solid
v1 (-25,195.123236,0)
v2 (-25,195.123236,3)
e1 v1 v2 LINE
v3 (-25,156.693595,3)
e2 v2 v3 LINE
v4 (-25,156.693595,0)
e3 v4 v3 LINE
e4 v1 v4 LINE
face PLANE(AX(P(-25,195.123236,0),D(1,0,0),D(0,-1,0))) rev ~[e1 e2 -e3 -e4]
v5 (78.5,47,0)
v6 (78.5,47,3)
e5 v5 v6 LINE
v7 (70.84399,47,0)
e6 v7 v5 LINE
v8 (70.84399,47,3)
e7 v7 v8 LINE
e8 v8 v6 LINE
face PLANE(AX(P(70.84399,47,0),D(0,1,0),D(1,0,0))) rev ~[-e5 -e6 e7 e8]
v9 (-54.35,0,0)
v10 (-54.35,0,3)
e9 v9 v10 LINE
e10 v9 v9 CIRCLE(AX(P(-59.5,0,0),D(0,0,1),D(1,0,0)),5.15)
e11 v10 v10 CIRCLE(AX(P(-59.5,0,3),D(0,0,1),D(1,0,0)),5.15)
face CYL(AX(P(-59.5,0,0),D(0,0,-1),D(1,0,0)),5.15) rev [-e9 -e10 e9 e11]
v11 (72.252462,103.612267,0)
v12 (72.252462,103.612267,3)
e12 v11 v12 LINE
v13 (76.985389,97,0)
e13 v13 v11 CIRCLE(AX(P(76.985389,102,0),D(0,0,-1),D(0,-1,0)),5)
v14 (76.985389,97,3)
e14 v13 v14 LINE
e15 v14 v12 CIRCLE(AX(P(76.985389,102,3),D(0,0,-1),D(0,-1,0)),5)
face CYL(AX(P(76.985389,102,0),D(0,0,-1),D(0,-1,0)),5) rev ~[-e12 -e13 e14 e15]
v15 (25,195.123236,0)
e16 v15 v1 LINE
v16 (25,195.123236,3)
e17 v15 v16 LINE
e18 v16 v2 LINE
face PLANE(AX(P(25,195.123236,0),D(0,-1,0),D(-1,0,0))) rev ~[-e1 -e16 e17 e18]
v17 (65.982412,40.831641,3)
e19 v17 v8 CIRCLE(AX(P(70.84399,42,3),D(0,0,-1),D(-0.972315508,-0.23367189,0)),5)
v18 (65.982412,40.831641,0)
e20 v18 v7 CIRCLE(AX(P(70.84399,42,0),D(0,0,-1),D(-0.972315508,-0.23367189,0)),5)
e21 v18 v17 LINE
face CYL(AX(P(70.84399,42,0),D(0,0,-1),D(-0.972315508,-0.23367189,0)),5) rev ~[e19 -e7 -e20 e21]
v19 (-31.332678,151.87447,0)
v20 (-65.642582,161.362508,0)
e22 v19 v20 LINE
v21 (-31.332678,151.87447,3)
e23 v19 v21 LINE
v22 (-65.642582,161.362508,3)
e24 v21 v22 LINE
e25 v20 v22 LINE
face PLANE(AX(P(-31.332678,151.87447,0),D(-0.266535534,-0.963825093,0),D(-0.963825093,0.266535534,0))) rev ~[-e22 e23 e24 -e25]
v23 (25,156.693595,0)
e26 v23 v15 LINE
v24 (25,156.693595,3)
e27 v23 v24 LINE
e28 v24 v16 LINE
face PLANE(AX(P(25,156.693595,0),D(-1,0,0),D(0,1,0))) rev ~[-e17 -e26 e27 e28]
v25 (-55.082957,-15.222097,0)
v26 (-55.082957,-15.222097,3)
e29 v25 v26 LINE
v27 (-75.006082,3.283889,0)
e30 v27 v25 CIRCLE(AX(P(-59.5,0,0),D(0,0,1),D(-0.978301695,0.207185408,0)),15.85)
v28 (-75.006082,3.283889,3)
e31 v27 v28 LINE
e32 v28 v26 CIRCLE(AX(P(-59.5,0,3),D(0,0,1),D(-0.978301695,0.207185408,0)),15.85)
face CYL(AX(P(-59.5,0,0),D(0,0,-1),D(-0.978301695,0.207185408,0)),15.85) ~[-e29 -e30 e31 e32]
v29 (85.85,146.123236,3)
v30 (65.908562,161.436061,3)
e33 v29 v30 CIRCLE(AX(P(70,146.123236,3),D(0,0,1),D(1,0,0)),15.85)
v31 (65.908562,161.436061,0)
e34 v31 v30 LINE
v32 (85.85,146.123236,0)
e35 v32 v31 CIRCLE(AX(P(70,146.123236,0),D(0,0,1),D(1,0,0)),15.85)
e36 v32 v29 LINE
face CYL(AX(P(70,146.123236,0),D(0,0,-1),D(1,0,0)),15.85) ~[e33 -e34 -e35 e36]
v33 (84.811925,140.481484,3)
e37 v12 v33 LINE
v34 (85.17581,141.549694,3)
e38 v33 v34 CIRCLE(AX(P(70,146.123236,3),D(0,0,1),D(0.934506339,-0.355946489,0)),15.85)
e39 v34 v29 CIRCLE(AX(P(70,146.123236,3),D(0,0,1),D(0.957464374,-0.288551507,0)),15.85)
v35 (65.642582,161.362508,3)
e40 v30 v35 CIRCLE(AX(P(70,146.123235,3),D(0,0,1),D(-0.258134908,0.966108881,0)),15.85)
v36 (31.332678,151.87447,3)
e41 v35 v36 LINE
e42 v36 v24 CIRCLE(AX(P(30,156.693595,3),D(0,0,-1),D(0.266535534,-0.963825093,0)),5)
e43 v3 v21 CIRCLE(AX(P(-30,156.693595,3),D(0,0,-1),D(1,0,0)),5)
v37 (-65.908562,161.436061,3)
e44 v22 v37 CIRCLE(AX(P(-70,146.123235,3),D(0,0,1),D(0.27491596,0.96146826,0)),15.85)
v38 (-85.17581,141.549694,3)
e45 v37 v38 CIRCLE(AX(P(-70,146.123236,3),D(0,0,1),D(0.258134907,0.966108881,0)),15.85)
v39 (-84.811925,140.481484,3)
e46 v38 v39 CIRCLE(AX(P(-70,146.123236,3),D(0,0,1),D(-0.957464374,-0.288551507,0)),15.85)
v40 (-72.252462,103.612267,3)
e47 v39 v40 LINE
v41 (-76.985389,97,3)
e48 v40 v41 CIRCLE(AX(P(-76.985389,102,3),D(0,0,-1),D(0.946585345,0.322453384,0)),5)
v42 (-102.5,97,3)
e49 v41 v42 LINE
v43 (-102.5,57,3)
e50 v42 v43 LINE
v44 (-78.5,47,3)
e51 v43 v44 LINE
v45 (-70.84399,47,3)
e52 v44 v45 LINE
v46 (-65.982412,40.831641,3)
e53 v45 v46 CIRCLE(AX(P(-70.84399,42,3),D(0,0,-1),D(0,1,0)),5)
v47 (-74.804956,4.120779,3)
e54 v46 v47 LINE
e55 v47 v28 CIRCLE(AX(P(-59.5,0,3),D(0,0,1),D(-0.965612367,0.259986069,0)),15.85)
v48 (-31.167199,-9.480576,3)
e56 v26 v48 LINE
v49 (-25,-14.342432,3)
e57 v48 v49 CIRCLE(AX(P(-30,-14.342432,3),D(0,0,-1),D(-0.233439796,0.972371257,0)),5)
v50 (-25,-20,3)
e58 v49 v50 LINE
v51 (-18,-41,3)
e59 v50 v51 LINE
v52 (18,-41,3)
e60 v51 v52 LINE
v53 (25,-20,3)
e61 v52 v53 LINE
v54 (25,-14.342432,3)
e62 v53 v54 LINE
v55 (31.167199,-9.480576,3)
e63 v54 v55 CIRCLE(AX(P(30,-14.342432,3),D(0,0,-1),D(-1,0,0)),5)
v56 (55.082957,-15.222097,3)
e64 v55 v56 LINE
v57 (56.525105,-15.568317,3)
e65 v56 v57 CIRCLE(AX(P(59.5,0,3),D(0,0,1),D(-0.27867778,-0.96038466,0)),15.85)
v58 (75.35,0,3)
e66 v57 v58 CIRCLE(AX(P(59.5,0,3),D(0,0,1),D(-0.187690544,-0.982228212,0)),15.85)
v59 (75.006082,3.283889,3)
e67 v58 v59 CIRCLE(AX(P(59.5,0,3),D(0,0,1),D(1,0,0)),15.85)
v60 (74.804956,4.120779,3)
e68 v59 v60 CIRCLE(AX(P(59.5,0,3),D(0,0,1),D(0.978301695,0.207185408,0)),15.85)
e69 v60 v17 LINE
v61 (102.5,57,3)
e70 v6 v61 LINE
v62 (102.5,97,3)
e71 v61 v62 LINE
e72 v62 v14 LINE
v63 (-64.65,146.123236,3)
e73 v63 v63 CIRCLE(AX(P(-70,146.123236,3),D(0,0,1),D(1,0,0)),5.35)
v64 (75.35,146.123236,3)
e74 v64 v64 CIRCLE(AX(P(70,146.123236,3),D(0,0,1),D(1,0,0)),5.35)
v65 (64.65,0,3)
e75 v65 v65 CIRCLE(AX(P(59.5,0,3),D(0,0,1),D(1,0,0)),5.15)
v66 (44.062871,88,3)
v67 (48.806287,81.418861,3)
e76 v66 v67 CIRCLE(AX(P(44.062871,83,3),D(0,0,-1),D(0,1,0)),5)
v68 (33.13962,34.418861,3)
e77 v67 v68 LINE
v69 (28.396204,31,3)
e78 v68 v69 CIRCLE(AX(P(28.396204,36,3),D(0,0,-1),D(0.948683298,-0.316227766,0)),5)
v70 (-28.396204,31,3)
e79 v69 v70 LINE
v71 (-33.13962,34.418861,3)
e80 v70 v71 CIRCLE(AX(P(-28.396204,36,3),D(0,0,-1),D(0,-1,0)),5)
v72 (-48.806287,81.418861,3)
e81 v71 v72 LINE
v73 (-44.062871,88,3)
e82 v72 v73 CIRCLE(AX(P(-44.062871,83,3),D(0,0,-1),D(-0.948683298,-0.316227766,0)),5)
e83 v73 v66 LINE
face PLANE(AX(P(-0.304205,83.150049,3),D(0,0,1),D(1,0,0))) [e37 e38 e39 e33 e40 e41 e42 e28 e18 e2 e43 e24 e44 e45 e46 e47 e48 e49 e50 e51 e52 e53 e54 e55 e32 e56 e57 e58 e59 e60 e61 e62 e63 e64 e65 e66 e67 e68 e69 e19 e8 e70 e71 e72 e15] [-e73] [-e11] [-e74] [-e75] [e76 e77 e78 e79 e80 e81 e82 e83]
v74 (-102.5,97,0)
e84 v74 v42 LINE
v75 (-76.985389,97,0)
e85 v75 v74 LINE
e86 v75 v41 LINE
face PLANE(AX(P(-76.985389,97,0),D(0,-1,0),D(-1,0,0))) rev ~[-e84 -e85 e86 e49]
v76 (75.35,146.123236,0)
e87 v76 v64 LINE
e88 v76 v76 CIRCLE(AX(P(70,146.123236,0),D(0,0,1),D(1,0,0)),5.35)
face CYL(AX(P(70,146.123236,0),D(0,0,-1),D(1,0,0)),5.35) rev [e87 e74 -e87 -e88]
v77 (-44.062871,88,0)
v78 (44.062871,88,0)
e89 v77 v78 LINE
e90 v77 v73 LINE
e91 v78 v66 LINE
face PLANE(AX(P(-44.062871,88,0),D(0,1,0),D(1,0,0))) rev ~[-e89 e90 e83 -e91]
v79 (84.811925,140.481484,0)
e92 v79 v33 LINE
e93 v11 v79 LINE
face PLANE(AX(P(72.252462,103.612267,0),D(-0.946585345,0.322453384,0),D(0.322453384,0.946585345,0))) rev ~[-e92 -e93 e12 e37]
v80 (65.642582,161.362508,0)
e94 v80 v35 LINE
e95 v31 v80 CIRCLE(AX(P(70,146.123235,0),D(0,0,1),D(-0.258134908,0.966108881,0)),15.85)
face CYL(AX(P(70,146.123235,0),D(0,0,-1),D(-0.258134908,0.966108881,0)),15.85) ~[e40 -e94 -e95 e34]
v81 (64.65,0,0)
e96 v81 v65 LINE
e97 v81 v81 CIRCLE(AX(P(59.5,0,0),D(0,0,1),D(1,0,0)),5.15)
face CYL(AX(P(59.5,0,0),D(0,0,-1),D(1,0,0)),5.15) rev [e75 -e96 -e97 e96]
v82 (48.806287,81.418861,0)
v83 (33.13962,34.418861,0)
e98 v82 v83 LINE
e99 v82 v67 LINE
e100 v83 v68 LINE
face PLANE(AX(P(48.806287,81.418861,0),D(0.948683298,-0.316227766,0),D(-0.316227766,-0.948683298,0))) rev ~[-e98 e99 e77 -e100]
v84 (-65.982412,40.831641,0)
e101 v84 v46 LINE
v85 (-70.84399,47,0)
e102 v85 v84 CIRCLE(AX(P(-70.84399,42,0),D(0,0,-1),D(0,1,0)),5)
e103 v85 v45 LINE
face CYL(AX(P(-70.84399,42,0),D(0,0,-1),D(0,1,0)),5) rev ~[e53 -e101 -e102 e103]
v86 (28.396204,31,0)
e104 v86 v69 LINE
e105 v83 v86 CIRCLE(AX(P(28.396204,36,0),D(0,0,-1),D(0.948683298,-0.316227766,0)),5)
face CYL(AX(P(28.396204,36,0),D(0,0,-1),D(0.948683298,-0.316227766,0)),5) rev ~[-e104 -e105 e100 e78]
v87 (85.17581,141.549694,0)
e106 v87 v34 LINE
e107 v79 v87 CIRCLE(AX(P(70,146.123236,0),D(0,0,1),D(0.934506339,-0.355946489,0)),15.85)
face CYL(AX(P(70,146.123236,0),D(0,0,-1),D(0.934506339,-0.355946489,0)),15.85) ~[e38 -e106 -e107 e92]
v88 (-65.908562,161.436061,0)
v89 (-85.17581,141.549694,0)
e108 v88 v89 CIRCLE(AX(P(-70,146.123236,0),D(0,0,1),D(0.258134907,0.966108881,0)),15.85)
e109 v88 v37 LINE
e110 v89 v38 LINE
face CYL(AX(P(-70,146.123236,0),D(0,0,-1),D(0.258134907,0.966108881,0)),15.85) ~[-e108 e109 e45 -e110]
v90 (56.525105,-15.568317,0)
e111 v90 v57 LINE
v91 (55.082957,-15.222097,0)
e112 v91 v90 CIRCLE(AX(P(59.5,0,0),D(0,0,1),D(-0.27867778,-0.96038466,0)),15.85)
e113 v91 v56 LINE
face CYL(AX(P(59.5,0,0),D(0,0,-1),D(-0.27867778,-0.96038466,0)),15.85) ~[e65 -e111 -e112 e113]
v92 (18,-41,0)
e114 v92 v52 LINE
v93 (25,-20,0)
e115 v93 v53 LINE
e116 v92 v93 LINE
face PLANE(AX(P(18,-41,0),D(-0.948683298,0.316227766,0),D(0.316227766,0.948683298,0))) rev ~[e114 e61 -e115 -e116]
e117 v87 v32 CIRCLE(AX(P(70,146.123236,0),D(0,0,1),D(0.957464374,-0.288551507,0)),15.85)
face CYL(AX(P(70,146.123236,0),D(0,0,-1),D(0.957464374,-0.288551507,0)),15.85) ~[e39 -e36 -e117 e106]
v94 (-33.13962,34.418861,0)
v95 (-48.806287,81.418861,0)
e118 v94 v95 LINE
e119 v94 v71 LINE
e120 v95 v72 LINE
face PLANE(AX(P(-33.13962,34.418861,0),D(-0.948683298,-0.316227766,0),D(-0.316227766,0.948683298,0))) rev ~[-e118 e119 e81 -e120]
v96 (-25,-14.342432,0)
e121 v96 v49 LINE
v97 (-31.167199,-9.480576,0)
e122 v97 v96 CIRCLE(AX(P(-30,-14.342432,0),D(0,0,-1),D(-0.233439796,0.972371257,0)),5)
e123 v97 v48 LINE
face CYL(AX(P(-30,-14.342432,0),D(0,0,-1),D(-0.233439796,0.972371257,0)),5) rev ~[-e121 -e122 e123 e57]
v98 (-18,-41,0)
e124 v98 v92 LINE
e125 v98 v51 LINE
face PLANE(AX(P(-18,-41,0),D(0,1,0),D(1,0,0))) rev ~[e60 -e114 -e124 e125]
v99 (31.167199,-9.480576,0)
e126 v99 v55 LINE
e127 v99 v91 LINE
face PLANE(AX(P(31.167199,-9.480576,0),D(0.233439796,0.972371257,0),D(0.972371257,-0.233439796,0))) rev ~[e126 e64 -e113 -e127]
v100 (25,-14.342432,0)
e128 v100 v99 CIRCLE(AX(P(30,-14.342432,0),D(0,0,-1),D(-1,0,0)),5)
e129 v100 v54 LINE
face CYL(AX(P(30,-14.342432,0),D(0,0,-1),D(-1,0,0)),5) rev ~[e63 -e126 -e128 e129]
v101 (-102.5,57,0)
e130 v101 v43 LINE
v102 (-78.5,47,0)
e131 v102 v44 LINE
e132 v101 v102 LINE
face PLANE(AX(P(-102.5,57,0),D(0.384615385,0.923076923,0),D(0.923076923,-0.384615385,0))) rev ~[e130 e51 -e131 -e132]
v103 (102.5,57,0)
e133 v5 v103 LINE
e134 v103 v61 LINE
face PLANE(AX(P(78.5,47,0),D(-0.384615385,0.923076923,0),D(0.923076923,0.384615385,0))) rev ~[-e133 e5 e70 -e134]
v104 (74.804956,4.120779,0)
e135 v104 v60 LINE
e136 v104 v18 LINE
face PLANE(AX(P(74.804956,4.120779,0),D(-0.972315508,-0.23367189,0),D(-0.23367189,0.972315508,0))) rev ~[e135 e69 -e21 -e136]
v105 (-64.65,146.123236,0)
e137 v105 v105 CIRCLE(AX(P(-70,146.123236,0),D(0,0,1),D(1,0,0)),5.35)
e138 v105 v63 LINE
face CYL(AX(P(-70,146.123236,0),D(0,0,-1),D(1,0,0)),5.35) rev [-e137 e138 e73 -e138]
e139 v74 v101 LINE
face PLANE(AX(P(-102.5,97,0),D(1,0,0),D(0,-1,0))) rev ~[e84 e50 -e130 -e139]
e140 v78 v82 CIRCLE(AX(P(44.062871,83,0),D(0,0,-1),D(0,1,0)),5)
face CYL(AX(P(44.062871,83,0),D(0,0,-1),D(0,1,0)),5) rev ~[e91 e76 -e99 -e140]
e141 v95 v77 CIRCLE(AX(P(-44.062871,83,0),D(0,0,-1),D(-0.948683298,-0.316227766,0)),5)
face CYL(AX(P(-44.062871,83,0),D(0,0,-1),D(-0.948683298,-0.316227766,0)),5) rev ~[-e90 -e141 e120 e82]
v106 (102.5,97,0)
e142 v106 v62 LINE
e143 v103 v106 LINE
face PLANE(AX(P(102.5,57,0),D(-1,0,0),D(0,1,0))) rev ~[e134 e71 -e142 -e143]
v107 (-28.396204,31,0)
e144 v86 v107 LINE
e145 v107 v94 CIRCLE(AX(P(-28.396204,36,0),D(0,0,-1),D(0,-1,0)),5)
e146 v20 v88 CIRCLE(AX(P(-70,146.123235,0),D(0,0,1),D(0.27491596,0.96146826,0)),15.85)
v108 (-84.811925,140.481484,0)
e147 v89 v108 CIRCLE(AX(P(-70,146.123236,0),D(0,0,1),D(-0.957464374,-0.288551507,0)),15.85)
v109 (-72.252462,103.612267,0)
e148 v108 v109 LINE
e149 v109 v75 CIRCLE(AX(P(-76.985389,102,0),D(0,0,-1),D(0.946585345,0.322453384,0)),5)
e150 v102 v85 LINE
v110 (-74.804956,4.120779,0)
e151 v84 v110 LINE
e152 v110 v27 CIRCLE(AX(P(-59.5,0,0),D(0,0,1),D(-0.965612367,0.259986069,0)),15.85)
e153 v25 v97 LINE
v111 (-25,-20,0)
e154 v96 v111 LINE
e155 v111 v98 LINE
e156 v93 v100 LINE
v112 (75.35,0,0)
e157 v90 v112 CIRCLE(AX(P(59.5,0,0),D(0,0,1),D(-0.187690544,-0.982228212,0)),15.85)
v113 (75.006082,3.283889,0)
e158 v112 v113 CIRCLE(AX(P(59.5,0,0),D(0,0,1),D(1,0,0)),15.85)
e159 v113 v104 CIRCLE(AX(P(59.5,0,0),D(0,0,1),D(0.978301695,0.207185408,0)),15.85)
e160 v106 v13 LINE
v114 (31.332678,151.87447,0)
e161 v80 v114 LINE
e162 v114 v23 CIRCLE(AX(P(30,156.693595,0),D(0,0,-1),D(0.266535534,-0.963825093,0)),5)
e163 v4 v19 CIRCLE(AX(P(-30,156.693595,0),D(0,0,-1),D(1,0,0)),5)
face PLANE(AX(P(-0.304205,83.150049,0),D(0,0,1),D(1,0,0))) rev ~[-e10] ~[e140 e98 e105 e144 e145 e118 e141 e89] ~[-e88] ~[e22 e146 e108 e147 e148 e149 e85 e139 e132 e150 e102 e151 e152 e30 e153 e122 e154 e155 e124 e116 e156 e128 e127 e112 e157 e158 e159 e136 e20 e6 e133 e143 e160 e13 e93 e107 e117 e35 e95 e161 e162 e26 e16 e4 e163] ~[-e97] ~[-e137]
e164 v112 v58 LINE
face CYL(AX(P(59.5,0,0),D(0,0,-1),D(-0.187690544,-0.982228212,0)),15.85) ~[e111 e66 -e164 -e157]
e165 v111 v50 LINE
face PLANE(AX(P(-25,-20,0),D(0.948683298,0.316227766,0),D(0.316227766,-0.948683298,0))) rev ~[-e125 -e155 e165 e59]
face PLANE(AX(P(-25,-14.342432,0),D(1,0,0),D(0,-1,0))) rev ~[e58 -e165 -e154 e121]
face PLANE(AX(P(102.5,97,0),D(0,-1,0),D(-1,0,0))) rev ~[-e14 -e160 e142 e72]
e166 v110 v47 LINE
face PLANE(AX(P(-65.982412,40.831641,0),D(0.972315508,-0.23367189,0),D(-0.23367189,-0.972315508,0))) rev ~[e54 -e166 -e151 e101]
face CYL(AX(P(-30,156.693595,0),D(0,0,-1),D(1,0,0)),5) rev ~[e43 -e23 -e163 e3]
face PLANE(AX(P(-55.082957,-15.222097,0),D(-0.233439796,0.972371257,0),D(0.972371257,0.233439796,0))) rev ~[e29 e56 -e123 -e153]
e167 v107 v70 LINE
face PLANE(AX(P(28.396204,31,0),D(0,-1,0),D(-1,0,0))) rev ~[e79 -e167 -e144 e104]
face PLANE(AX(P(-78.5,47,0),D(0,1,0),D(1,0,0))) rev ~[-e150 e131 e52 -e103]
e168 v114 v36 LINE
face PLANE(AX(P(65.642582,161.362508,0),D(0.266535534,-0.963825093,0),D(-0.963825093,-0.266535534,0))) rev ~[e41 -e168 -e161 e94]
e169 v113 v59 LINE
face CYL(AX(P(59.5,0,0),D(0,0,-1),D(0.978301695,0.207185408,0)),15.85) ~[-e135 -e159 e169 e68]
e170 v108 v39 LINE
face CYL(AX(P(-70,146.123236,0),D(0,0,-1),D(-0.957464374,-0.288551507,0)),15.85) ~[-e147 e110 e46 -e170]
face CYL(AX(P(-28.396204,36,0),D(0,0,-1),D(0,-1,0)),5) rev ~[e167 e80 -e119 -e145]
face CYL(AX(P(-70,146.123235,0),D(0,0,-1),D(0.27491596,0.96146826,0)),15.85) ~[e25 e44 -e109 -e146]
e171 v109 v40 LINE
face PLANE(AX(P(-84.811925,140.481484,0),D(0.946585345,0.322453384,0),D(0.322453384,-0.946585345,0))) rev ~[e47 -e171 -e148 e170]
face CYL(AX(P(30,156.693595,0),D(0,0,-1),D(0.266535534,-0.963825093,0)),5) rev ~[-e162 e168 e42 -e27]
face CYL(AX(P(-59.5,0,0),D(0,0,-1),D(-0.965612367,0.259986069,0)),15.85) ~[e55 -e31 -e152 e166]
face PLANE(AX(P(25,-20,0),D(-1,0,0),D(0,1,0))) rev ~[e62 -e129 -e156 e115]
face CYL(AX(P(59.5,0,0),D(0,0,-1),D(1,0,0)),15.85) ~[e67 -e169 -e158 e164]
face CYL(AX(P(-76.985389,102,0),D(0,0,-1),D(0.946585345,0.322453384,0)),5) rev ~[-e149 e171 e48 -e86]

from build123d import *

# Parameters (mm, degrees)
F0_R     = 5.15
F0_R_2   = 5.35
F1_DEPTH = 3
F2_DEPTH = 3


# Not quite as in the source:
# - a feature names something its author has since deleted; it is built from what else it names


with BuildPart() as f1:
    # F0 (on Top) → F1 (new body)
    with BuildSketch(Plane.XY):
        with BuildLine():
            Line((-25, -20), (0, -20))
            Line((0, -20), (25, -20))
            Line((25, -20), (25, -14.3424324172))
            ThreePointArc((25, -14.3424324172), (26.9045190123, -10.4158566246), (31.167198982, -9.4805761322))
            Line((31.167198982, -9.4805761322), (55.0829571834, -15.2220968581))
            ThreePointArc((55.0829571834, -15.2220968581), (48.4016498049, 11.3158792388), (74.8049560197, 4.1207792025))
            Line((74.8049560197, 4.1207792025), (65.9824120319, 40.8316405516))
            ThreePointArc((65.9824120319, 40.8316405516), (66.917044372, 45.0950123391), (70.8439895742, 47))
            Line((70.8439895742, 47), (78.5, 47))
            Line((78.5, 47), (102.5, 57))
            Line((102.5, 57), (102.5, 97))
            Line((102.5, 97), (78.5, 97))
            Line((78.5, 97), (76.9853890649, 97))
            ThreePointArc((76.9853890649, 97), (72.9195967319, 99.0897882028), (72.2524623398, 103.6122669181))
            Line((72.2524623398, 103.6122669181), (84.8119254692, 140.4814838147))
            ThreePointArc((84.8119254692, 140.4814838147), (58.3240216641, 135.4043723862), (65.6425820254, 161.362507579))
            Line((65.6425820254, 161.362507579), (31.3326776693, 151.8744700251))
            ThreePointArc((31.3326776693, 151.8744700251), (26.9720789596, 152.7146893354), (25, 156.6935954883))
            Line((25, 156.6935954883), (25, 195.1232356609))
            Line((25, 195.1232356609), (0, 195.1232356609))
            Line((0, 195.1232356609), (-25, 195.1232356609))
            Line((-25, 195.1232356609), (-25, 156.6935954883))
            ThreePointArc((-25, 156.6935954883), (-26.9720789596, 152.7146893354), (-31.3326776693, 151.8744700251))
            Line((-31.3326776693, 151.8744700251), (-65.6425820254, 161.362507579))
            ThreePointArc((-65.6425820254, 161.362507579), (-57.3452069377, 155.666752442), (-54.15, 146.1232356609))
            ThreePointArc((-54.15, 146.1232356609), (-67.1317704666, 130.5349144124), (-84.8119254692, 140.4814838147))
            Line((-84.8119254692, 140.4814838147), (-72.2524623398, 103.6122669181))
            ThreePointArc((-72.2524623398, 103.6122669181), (-72.9195967319, 99.0897882028), (-76.9853890649, 97))
            Line((-76.9853890649, 97), (-78.5, 97))
            Line((-78.5, 97), (-102.5, 97))
            Line((-102.5, 97), (-102.5, 57))
            Line((-102.5, 57), (-78.5, 47))
            Line((-78.5, 47), (-70.8439895742, 47))
            ThreePointArc((-70.8439895742, 47), (-66.917044372, 45.0950123391), (-65.9824120319, 40.8316405516))
            Line((-65.9824120319, 40.8316405516), (-74.8049560197, 4.1207792025))
            ThreePointArc((-74.8049560197, 4.1207792025), (-57.4216656804, 15.7131482032), (-43.65, 0))
            ThreePointArc((-43.65, 0), (-46.826550812, -9.5187281545), (-55.0829571834, -15.2220968581))
            Line((-55.0829571834, -15.2220968581), (-31.167198982, -9.4805761322))
            ThreePointArc((-31.167198982, -9.4805761322), (-26.9045190123, -10.4158566246), (-25, -14.3424324172))
            Line((-25, -14.3424324172), (-25, -20))
        make_face()
        with BuildLine():
            Line((28.3962038997, 31), (0, 31))
            Line((0, 31), (-28.3962038997, 31))
            ThreePointArc((-28.3962038997, 31), (-31.319755323, 31.9437890741), (-33.13962039, 34.4188611699))
            Line((-33.13962039, 34.4188611699), (-48.8062870566, 81.4188611699))
            ThreePointArc((-48.8062870566, 81.4188611699), (-48.1190814923, 85.9235514233), (-44.0628705664, 88))
            Line((-44.0628705664, 88), (0, 88))
            Line((0, 88), (44.0628705664, 88))
            ThreePointArc((44.0628705664, 88), (48.1190814923, 85.9235514233), (48.8062870566, 81.4188611699))
            Line((48.8062870566, 81.4188611699), (33.13962039, 34.4188611699))
            ThreePointArc((33.13962039, 34.4188611699), (31.319755323, 31.9437890741), (28.3962038997, 31))
        make_face(mode=Mode.SUBTRACT)
        Polygon((25, -20), (0, -20), (-25, -20), (-18, -41), (0, -41), (18, -41), align=None)
        with BuildLine():
            ThreePointArc((74.8049560197, 4.1207792025), (48.4016498049, 11.3158792388), (55.0829571834, -15.2220968581))
            Line((55.0829571834, -15.2220968581), (56.5251048848, -15.5683171555))
            Line((56.5251048848, -15.5683171555), (75.0060818693, 3.2838887103))
            Line((75.0060818693, 3.2838887103), (74.8049560197, 4.1207792025))
        make_face()
        with Locations((59.5, 0)):
            Circle(F0_R, mode=Mode.SUBTRACT)
        with BuildLine():
            Line((56.5251048848, -15.5683171555), (55.0829571834, -15.2220968581))
            ThreePointArc((55.0829571834, -15.2220968581), (55.799979227, -15.4120844236), (56.5251048848, -15.5683171555))
        make_face()
        with BuildLine():
            Line((-56.5251048848, -15.5683171555), (-55.0829571834, -15.2220968581))
            ThreePointArc((-55.0829571834, -15.2220968581), (-46.826550812, -9.5187281545), (-43.65, 0))
            ThreePointArc((-43.65, 0), (-57.4216656804, 15.7131482032), (-74.8049560197, 4.1207792025))
            Line((-74.8049560197, 4.1207792025), (-75.0060818693, 3.2838887103))
            Line((-75.0060818693, 3.2838887103), (-56.5251048848, -15.5683171555))
        make_face()
        with Locations((-59.5, 0)):
            Circle(F0_R, mode=Mode.SUBTRACT)
        with BuildLine():
            ThreePointArc((-56.5251048848, -15.5683171555), (-55.799979227, -15.4120844236), (-55.0829571834, -15.2220968581))
            Line((-55.0829571834, -15.2220968581), (-56.5251048848, -15.5683171555))
        make_face()
        with BuildLine():
            Line((75.0060818693, 3.2838887103), (56.5251048848, -15.5683171555))
            ThreePointArc((56.5251048848, -15.5683171555), (69.6012477552, -12.2142250588), (75.35, 0))
            ThreePointArc((75.35, 0), (75.2637859924, 1.6509243428), (75.0060818693, 3.2838887103))
        make_face()
        with BuildLine():
            ThreePointArc((75.0060818693, 3.2838887103), (74.9112008089, 3.7036994515), (74.8049560197, 4.1207792025))
            Line((74.8049560197, 4.1207792025), (75.0060818693, 3.2838887103))
        make_face()
        with BuildLine():
            ThreePointArc((-75.0060818693, 3.2838887103), (-70.8185280345, -11.0956488378), (-56.5251048848, -15.5683171555))
            Line((-56.5251048848, -15.5683171555), (-75.0060818693, 3.2838887103))
        make_face()
        with BuildLine():
            ThreePointArc((-74.8049560197, 4.1207792025), (-74.9112008089, 3.7036994515), (-75.0060818693, 3.2838887103))
            Line((-75.0060818693, 3.2838887103), (-74.8049560197, 4.1207792025))
        make_face()
        with BuildLine():
            ThreePointArc((65.6425820254, 161.362507579), (58.3240216641, 135.4043723862), (84.8119254692, 140.4814838147))
            Line((84.8119254692, 140.4814838147), (85.1758103286, 141.5496942681))
            Line((85.1758103286, 141.5496942681), (65.9085617168, 161.4360614215))
            Line((65.9085617168, 161.4360614215), (65.6425820254, 161.362507579))
        make_face()
        with Locations((70, 146.1232356609)):
            Circle(F0_R_2, mode=Mode.SUBTRACT)
        with BuildLine():
            Line((85.1758103286, 141.5496942681), (84.8119254692, 140.4814838147))
            ThreePointArc((84.8119254692, 140.4814838147), (85.0033777185, 141.0123495306), (85.1758103286, 141.5496942681))
        make_face()
        with BuildLine():
            Line((65.9085617168, 161.4360614215), (85.1758103286, 141.5496942681))
            ThreePointArc((85.1758103286, 141.5496942681), (85.6805467651, 143.8117527719), (85.85, 146.1232356609))
            ThreePointArc((85.85, 146.1232356609), (79.6533207553, 158.6944686312), (65.9085617168, 161.4360614215))
        make_face()
        with BuildLine():
            ThreePointArc((65.9085617168, 161.4360614215), (65.7754117883, 161.3998633791), (65.6425820254, 161.362507579))
            Line((65.6425820254, 161.362507579), (65.9085617168, 161.4360614215))
        make_face()
        with BuildLine():
            ThreePointArc((-85.1758103286, 141.5496942681), (-85.0033777185, 141.0123495306), (-84.8119254692, 140.4814838147))
            Line((-84.8119254692, 140.4814838147), (-85.1758103286, 141.5496942681))
        make_face()
        with BuildLine():
            Line((-85.1758103286, 141.5496942681), (-84.8119254692, 140.4814838147))
            ThreePointArc((-84.8119254692, 140.4814838147), (-67.1317704666, 130.5349144124), (-54.15, 146.1232356609))
            ThreePointArc((-54.15, 146.1232356609), (-57.3452069377, 155.666752442), (-65.6425820254, 161.362507579))
            Line((-65.6425820254, 161.362507579), (-65.9085617168, 161.4360614215))
            Line((-65.9085617168, 161.4360614215), (-85.1758103286, 141.5496942681))
        make_face()
        with Locations((-70, 146.1232356609)):
            Circle(F0_R_2, mode=Mode.SUBTRACT)
        with BuildLine():
            ThreePointArc((-65.9085617168, 161.4360614215), (-81.3834408484, 157.1522779788), (-85.1758103286, 141.5496942681))
            Line((-85.1758103286, 141.5496942681), (-65.9085617168, 161.4360614215))
        make_face()
        with BuildLine():
            ThreePointArc((-65.6425820254, 161.362507579), (-65.7754117883, 161.3998633791), (-65.9085617168, 161.4360614215))
            Line((-65.9085617168, 161.4360614215), (-65.6425820254, 161.362507579))
        make_face()
    extrude(amount=F1_DEPTH)

    # F0 (on Top) → F2 (join)
    with BuildSketch(Plane.XY):
        with BuildLine():
            Line((-25, -20), (0, -20))
            Line((0, -20), (25, -20))
            Line((25, -20), (25, -14.3424324172))
            ThreePointArc((25, -14.3424324172), (26.9045190123, -10.4158566246), (31.167198982, -9.4805761322))
            Line((31.167198982, -9.4805761322), (55.0829571834, -15.2220968581))
            ThreePointArc((55.0829571834, -15.2220968581), (48.4016498049, 11.3158792388), (74.8049560197, 4.1207792025))
            Line((74.8049560197, 4.1207792025), (65.9824120319, 40.8316405516))
            ThreePointArc((65.9824120319, 40.8316405516), (66.917044372, 45.0950123391), (70.8439895742, 47))
            Line((70.8439895742, 47), (78.5, 47))
            Line((78.5, 47), (102.5, 57))
            Line((102.5, 57), (102.5, 97))
            Line((102.5, 97), (78.5, 97))
            Line((78.5, 97), (76.9853890649, 97))
            ThreePointArc((76.9853890649, 97), (72.9195967319, 99.0897882028), (72.2524623398, 103.6122669181))
            Line((72.2524623398, 103.6122669181), (84.8119254692, 140.4814838147))
            ThreePointArc((84.8119254692, 140.4814838147), (58.3240216641, 135.4043723862), (65.6425820254, 161.362507579))
            Line((65.6425820254, 161.362507579), (31.3326776693, 151.8744700251))
            ThreePointArc((31.3326776693, 151.8744700251), (26.9720789596, 152.7146893354), (25, 156.6935954883))
            Line((25, 156.6935954883), (25, 195.1232356609))
            Line((25, 195.1232356609), (0, 195.1232356609))
            Line((0, 195.1232356609), (-25, 195.1232356609))
            Line((-25, 195.1232356609), (-25, 156.6935954883))
            ThreePointArc((-25, 156.6935954883), (-26.9720789596, 152.7146893354), (-31.3326776693, 151.8744700251))
            Line((-31.3326776693, 151.8744700251), (-65.6425820254, 161.362507579))
            ThreePointArc((-65.6425820254, 161.362507579), (-57.3452069377, 155.666752442), (-54.15, 146.1232356609))
            ThreePointArc((-54.15, 146.1232356609), (-67.1317704666, 130.5349144124), (-84.8119254692, 140.4814838147))
            Line((-84.8119254692, 140.4814838147), (-72.2524623398, 103.6122669181))
            ThreePointArc((-72.2524623398, 103.6122669181), (-72.9195967319, 99.0897882028), (-76.9853890649, 97))
            Line((-76.9853890649, 97), (-78.5, 97))
            Line((-78.5, 97), (-102.5, 97))
            Line((-102.5, 97), (-102.5, 57))
            Line((-102.5, 57), (-78.5, 47))
            Line((-78.5, 47), (-70.8439895742, 47))
            ThreePointArc((-70.8439895742, 47), (-66.917044372, 45.0950123391), (-65.9824120319, 40.8316405516))
            Line((-65.9824120319, 40.8316405516), (-74.8049560197, 4.1207792025))
            ThreePointArc((-74.8049560197, 4.1207792025), (-57.4216656804, 15.7131482032), (-43.65, 0))
            ThreePointArc((-43.65, 0), (-46.826550812, -9.5187281545), (-55.0829571834, -15.2220968581))
            Line((-55.0829571834, -15.2220968581), (-31.167198982, -9.4805761322))
            ThreePointArc((-31.167198982, -9.4805761322), (-26.9045190123, -10.4158566246), (-25, -14.3424324172))
            Line((-25, -14.3424324172), (-25, -20))
        make_face()
        with BuildLine():
            Line((28.3962038997, 31), (0, 31))
            Line((0, 31), (-28.3962038997, 31))
            ThreePointArc((-28.3962038997, 31), (-31.319755323, 31.9437890741), (-33.13962039, 34.4188611699))
            Line((-33.13962039, 34.4188611699), (-48.8062870566, 81.4188611699))
            ThreePointArc((-48.8062870566, 81.4188611699), (-48.1190814923, 85.9235514233), (-44.0628705664, 88))
            Line((-44.0628705664, 88), (0, 88))
            Line((0, 88), (44.0628705664, 88))
            ThreePointArc((44.0628705664, 88), (48.1190814923, 85.9235514233), (48.8062870566, 81.4188611699))
            Line((48.8062870566, 81.4188611699), (33.13962039, 34.4188611699))
            ThreePointArc((33.13962039, 34.4188611699), (31.319755323, 31.9437890741), (28.3962038997, 31))
        make_face(mode=Mode.SUBTRACT)
        Polygon((25, -20), (0, -20), (-25, -20), (-18, -41), (0, -41), (18, -41), align=None)
        with BuildLine():
            ThreePointArc((74.8049560197, 4.1207792025), (48.4016498049, 11.3158792388), (55.0829571834, -15.2220968581))
            Line((55.0829571834, -15.2220968581), (56.5251048848, -15.5683171555))
            Line((56.5251048848, -15.5683171555), (75.0060818693, 3.2838887103))
            Line((75.0060818693, 3.2838887103), (74.8049560197, 4.1207792025))
        make_face()
        with Locations((59.5, 0)):
            Circle(F0_R, mode=Mode.SUBTRACT)
        with BuildLine():
            Line((56.5251048848, -15.5683171555), (55.0829571834, -15.2220968581))
            ThreePointArc((55.0829571834, -15.2220968581), (55.799979227, -15.4120844236), (56.5251048848, -15.5683171555))
        make_face()
        with BuildLine():
            Line((-56.5251048848, -15.5683171555), (-55.0829571834, -15.2220968581))
            ThreePointArc((-55.0829571834, -15.2220968581), (-46.826550812, -9.5187281545), (-43.65, 0))
            ThreePointArc((-43.65, 0), (-57.4216656804, 15.7131482032), (-74.8049560197, 4.1207792025))
            Line((-74.8049560197, 4.1207792025), (-75.0060818693, 3.2838887103))
            Line((-75.0060818693, 3.2838887103), (-56.5251048848, -15.5683171555))
        make_face()
        with Locations((-59.5, 0)):
            Circle(F0_R, mode=Mode.SUBTRACT)
        with BuildLine():
            ThreePointArc((-56.5251048848, -15.5683171555), (-55.799979227, -15.4120844236), (-55.0829571834, -15.2220968581))
            Line((-55.0829571834, -15.2220968581), (-56.5251048848, -15.5683171555))
        make_face()
        with BuildLine():
            Line((75.0060818693, 3.2838887103), (56.5251048848, -15.5683171555))
            ThreePointArc((56.5251048848, -15.5683171555), (69.6012477552, -12.2142250588), (75.35, 0))
            ThreePointArc((75.35, 0), (75.2637859924, 1.6509243428), (75.0060818693, 3.2838887103))
        make_face()
        with BuildLine():
            ThreePointArc((75.0060818693, 3.2838887103), (74.9112008089, 3.7036994515), (74.8049560197, 4.1207792025))
            Line((74.8049560197, 4.1207792025), (75.0060818693, 3.2838887103))
        make_face()
        with BuildLine():
            ThreePointArc((-75.0060818693, 3.2838887103), (-70.8185280345, -11.0956488378), (-56.5251048848, -15.5683171555))
            Line((-56.5251048848, -15.5683171555), (-75.0060818693, 3.2838887103))
        make_face()
        with BuildLine():
            ThreePointArc((-74.8049560197, 4.1207792025), (-74.9112008089, 3.7036994515), (-75.0060818693, 3.2838887103))
            Line((-75.0060818693, 3.2838887103), (-74.8049560197, 4.1207792025))
        make_face()
        with BuildLine():
            ThreePointArc((65.6425820254, 161.362507579), (58.3240216641, 135.4043723862), (84.8119254692, 140.4814838147))
            Line((84.8119254692, 140.4814838147), (85.1758103286, 141.5496942681))
            Line((85.1758103286, 141.5496942681), (65.9085617168, 161.4360614215))
            Line((65.9085617168, 161.4360614215), (65.6425820254, 161.362507579))
        make_face()
        with Locations((70, 146.1232356609)):
            Circle(F0_R_2, mode=Mode.SUBTRACT)
        with BuildLine():
            Line((85.1758103286, 141.5496942681), (84.8119254692, 140.4814838147))
            ThreePointArc((84.8119254692, 140.4814838147), (85.0033777185, 141.0123495306), (85.1758103286, 141.5496942681))
        make_face()
        with BuildLine():
            Line((65.9085617168, 161.4360614215), (85.1758103286, 141.5496942681))
            ThreePointArc((85.1758103286, 141.5496942681), (85.6805467651, 143.8117527719), (85.85, 146.1232356609))
            ThreePointArc((85.85, 146.1232356609), (79.6533207553, 158.6944686312), (65.9085617168, 161.4360614215))
        make_face()
        with BuildLine():
            ThreePointArc((65.9085617168, 161.4360614215), (65.7754117883, 161.3998633791), (65.6425820254, 161.362507579))
            Line((65.6425820254, 161.362507579), (65.9085617168, 161.4360614215))
        make_face()
        with BuildLine():
            ThreePointArc((-85.1758103286, 141.5496942681), (-85.0033777185, 141.0123495306), (-84.8119254692, 140.4814838147))
            Line((-84.8119254692, 140.4814838147), (-85.1758103286, 141.5496942681))
        make_face()
        with BuildLine():
            Line((-85.1758103286, 141.5496942681), (-84.8119254692, 140.4814838147))
            ThreePointArc((-84.8119254692, 140.4814838147), (-67.1317704666, 130.5349144124), (-54.15, 146.1232356609))
            ThreePointArc((-54.15, 146.1232356609), (-57.3452069377, 155.666752442), (-65.6425820254, 161.362507579))
            Line((-65.6425820254, 161.362507579), (-65.9085617168, 161.4360614215))
            Line((-65.9085617168, 161.4360614215), (-85.1758103286, 141.5496942681))
        make_face()
        with Locations((-70, 146.1232356609)):
            Circle(F0_R_2, mode=Mode.SUBTRACT)
        with BuildLine():
            ThreePointArc((-65.9085617168, 161.4360614215), (-81.3834408484, 157.1522779788), (-85.1758103286, 141.5496942681))
            Line((-85.1758103286, 141.5496942681), (-65.9085617168, 161.4360614215))
        make_face()
        with BuildLine():
            ThreePointArc((-65.6425820254, 161.362507579), (-65.7754117883, 161.3998633791), (-65.9085617168, 161.4360614215))
            Line((-65.9085617168, 161.4360614215), (-65.6425820254, 161.362507579))
        make_face()
    extrude(amount=F2_DEPTH)


solid = f1.part
